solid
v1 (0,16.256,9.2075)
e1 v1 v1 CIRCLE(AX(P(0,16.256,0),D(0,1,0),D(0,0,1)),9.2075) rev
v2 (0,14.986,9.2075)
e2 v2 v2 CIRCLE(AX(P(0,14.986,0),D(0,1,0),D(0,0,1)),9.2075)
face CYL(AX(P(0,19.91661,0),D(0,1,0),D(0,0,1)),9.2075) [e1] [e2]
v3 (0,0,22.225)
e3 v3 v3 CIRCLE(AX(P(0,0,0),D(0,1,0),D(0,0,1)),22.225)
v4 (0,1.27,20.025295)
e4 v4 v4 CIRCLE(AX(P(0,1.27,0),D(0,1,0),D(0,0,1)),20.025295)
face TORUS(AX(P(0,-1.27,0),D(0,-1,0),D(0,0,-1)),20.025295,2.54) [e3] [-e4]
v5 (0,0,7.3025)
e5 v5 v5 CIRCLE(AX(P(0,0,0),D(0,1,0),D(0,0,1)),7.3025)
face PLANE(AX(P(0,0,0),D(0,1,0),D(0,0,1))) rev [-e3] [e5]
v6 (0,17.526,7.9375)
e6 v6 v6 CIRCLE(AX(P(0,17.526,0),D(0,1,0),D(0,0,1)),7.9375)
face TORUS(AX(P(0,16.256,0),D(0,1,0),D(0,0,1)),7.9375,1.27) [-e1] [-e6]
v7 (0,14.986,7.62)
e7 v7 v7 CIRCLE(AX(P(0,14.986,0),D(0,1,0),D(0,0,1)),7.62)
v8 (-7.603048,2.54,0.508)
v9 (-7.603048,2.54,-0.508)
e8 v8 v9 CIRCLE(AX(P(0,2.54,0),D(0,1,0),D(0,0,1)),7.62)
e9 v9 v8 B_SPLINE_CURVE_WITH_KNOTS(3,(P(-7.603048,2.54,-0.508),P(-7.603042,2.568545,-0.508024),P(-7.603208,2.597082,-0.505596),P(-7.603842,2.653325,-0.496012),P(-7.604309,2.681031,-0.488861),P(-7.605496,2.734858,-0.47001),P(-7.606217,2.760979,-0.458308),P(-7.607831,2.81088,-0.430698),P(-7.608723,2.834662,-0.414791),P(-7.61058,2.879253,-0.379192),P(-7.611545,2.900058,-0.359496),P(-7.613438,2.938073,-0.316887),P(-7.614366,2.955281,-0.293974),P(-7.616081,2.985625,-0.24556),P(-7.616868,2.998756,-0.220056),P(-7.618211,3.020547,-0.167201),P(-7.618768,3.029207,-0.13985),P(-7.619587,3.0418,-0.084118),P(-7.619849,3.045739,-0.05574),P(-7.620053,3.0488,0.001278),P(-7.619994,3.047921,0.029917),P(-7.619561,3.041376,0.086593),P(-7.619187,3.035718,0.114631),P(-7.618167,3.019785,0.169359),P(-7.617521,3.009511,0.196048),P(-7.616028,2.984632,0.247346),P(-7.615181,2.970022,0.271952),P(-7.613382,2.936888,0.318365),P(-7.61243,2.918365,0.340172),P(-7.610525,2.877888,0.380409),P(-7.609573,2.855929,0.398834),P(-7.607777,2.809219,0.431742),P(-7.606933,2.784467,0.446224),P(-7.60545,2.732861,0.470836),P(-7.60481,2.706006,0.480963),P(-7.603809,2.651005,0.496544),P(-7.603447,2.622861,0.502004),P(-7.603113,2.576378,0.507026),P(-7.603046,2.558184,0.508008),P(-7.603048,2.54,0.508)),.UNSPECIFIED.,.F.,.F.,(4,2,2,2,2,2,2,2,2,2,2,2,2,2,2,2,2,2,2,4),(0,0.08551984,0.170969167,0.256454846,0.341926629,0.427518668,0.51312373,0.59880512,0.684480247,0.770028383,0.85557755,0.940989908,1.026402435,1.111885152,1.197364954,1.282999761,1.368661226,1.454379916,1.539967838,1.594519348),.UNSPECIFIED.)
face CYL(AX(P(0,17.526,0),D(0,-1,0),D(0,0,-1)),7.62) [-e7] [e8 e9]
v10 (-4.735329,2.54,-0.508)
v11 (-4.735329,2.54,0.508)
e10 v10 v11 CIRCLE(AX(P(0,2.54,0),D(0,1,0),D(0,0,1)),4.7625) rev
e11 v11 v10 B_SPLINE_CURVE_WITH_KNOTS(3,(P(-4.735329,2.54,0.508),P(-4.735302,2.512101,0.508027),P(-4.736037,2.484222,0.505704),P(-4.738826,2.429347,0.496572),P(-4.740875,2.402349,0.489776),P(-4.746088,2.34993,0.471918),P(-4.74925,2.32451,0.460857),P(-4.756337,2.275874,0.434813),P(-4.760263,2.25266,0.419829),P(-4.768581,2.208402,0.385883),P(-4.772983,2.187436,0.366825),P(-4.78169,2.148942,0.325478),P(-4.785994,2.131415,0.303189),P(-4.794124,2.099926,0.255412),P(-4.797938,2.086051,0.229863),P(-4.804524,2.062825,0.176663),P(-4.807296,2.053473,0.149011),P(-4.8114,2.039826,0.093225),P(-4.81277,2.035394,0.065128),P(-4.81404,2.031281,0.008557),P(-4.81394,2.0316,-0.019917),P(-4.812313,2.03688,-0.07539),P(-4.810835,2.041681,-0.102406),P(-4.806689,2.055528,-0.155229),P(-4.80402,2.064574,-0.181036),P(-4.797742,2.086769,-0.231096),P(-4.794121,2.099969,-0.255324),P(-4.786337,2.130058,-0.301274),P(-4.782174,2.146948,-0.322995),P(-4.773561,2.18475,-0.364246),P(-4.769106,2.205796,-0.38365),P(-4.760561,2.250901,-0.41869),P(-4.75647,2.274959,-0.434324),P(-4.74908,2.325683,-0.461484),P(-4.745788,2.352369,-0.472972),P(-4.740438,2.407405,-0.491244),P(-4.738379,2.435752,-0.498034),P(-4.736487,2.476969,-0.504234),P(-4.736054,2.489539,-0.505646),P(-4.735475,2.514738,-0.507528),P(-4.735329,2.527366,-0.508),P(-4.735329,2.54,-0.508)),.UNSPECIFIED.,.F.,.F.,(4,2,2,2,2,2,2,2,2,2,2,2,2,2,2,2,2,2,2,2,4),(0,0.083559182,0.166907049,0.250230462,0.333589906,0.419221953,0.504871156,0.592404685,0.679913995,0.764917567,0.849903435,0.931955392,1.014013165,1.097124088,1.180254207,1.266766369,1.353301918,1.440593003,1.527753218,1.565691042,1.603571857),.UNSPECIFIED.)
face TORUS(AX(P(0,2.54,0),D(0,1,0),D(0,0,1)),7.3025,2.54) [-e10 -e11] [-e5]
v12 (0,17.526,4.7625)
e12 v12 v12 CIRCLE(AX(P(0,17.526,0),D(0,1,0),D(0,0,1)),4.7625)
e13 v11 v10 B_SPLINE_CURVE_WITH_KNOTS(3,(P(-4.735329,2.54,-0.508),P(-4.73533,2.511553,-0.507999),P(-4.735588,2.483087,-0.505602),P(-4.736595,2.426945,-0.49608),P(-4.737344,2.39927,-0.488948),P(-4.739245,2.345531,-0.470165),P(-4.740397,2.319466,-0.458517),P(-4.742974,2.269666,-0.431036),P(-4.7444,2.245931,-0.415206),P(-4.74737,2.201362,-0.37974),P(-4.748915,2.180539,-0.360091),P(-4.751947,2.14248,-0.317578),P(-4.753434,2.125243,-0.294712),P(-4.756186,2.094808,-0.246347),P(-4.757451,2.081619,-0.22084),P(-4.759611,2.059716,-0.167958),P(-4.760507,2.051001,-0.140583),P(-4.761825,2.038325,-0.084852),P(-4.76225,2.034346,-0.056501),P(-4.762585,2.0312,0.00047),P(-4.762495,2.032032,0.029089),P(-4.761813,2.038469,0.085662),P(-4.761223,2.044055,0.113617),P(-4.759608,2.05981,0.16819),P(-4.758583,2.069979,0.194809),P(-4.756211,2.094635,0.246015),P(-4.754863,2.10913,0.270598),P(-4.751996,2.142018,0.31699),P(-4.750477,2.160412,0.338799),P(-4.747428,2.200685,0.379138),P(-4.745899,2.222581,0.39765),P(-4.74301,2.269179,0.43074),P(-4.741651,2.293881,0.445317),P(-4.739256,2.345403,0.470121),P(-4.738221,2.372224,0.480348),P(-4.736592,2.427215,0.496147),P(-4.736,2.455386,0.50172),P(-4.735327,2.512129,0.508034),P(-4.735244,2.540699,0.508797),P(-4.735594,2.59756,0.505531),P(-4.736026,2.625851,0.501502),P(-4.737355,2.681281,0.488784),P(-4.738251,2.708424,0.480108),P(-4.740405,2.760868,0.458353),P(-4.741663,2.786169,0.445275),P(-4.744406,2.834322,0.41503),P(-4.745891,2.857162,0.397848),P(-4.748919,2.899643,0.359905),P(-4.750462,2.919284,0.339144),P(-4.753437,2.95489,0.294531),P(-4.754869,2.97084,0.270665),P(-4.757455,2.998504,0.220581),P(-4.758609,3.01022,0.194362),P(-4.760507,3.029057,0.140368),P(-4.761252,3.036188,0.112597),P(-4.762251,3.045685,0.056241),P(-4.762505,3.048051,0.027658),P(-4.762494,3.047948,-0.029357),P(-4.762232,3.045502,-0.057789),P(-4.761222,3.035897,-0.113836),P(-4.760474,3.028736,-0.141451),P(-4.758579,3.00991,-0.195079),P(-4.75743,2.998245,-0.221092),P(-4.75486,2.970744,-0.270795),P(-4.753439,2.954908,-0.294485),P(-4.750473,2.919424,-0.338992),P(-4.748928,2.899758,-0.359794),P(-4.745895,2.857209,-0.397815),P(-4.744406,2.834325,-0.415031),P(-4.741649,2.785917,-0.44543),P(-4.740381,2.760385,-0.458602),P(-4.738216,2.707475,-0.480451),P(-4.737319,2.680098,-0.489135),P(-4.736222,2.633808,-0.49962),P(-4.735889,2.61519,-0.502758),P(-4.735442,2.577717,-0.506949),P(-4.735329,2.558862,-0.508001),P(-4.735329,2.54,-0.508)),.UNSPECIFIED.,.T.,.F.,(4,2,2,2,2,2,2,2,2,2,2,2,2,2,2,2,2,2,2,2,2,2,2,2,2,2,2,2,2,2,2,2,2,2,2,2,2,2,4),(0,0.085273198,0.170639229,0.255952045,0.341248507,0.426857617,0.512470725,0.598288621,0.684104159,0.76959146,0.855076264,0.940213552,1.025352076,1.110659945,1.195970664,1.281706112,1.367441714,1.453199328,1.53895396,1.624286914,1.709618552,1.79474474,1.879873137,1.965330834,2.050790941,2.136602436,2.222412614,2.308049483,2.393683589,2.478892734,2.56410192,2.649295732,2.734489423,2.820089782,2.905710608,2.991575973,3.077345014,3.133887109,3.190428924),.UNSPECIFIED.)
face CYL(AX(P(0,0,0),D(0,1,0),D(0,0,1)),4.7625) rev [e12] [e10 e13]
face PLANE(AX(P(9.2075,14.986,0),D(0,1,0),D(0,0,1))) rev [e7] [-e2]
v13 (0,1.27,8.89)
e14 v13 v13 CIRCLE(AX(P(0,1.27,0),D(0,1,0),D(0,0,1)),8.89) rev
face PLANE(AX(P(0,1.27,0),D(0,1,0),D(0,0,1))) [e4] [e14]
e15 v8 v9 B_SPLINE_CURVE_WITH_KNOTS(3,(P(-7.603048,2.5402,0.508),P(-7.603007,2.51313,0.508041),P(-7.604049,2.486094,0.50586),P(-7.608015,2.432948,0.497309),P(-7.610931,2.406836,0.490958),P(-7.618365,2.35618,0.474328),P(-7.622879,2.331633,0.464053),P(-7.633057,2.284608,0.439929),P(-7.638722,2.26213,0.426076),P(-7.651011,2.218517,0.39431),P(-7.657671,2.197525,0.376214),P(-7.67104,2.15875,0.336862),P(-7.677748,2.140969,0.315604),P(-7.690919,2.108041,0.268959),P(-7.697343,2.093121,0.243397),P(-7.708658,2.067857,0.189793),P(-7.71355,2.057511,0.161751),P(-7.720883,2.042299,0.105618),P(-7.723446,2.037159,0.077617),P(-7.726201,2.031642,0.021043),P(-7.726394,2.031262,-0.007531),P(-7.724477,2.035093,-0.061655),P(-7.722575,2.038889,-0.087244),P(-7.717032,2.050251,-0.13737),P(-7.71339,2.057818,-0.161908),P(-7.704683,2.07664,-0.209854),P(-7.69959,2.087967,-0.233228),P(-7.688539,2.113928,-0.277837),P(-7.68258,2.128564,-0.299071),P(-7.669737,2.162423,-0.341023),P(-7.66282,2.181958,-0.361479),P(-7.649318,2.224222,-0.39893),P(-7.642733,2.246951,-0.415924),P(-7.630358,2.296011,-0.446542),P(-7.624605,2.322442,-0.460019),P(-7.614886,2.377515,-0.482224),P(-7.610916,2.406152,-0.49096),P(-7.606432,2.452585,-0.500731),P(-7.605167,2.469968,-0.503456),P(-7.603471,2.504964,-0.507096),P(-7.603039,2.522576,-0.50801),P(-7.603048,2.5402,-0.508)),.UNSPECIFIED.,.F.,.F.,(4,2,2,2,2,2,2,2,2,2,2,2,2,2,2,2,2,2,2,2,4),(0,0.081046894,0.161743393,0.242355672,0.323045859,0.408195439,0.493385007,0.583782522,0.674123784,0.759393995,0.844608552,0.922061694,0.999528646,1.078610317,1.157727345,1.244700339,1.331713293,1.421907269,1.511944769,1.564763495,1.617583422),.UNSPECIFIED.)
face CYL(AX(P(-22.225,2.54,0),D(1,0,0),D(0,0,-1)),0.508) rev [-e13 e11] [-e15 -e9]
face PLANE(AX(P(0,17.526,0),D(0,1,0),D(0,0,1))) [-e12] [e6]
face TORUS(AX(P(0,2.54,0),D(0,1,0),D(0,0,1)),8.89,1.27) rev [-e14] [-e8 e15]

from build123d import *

# Parameters (mm, degrees)
SKETCH1_R           = 22.225
BOSS_EXTRUDE1_DEPTH = 1.27
SKETCH2_R           = 7.62
BOSS_EXTRUDE2_DEPTH = 16.256
SKETCH3_R           = 4.7625
CUT_EXTRUDE1_DEPTH  = 36.986968836
FILLET1_R           = 1.27
SKETCH4_R           = 0.508
CUT_EXTRUDE2_DEPTH  = 36.986968836
FILLET2_R           = 2.54
FILLET3_R           = 2.54
SKETCH5_W           = 1.5875
SKETCH5_H           = 2.54
FILLET4_R           = 1.27


with BuildPart() as part:
    # Sketch1 → Boss-Extrude1 (new body)
    with BuildSketch(Plane(origin=(0, 0, 0), x_dir=(1, 0, 0), z_dir=(0, 1, 0))):
        with Locations(Location((0, 0, 0), (0, 0, 270))):
            Circle(SKETCH1_R)
    extrude(amount=BOSS_EXTRUDE1_DEPTH)

    # Sketch2 → Boss-Extrude2 (add)
    with BuildSketch(Plane(origin=(0, 1.27, 0), x_dir=(1, 0, 0), z_dir=(0, 1, 0))):
        with Locations(Location((0, 0, 0), (0, 0, 270))):
            Circle(SKETCH2_R)
    extrude(amount=BOSS_EXTRUDE2_DEPTH)

    # Sketch3 → Cut-Extrude1 (cut, through all)
    with BuildSketch(Plane(origin=(0, 17.526, 0), x_dir=(1, 0, 0), z_dir=(0, 1, 0))):
        with Locations(Location((0, 0, 0), (0, 0, 270))):
            Circle(SKETCH3_R)
    extrude(amount=-CUT_EXTRUDE1_DEPTH, mode=Mode.SUBTRACT)

    # Fillet1
    fillet1_edges = [part.edges().sort_by_distance(p)[0] for p in [
        (0, 1.27, -7.62),
    ]]
    fillet(fillet1_edges, radius=FILLET1_R)

    # Sketch4 → Cut-Extrude2 (cut, through all)
    with BuildSketch(Plane(origin=(0, 0, 0), x_dir=(0, 0, -1), z_dir=(1, 0, 0))):
        with Locations((0, 2.54)):
            Circle(SKETCH4_R)
    extrude(amount=-CUT_EXTRUDE2_DEPTH, mode=Mode.SUBTRACT)

    # Fillet2
    # the kernel refuses this fillet: 2.54 mm, written as the material it takes off along each edge
    with BuildSketch(Plane(origin=(0, 1.27, 0), x_dir=(0, 0, 1), z_dir=(-1, 0, 0))) as fillet2_piece_1:
        with BuildLine():
            CenterArc((20.025295474, -2.54), FILLET2_R, 30, 60)
            Line((22.225, -1.27), (22.268994091, -1.2446))
            ThreePointArc((22.268994091, -1.2446), (22.2758, -0.635), (22.2758, 0))
            Line((22.2758, 0), (22.225, 0.0508))
            Line((22.225, 0.0508), (20.025295474, 0.0508))
            Line((20.025295474, 0.0508), (20.025295474, 0))
        make_face()
    revolve(axis=Axis((0, 1.27, 0), (0, 1, 0)), mode=Mode.SUBTRACT)

    # Fillet3
    # the kernel refuses this fillet: 2.54 mm, written as the material it takes off along each edge
    with BuildSketch(Plane(origin=(0, 0, 0), x_dir=(0, 0, 1), z_dir=(-1, 0, 0))) as fillet3_piece_1:
        with BuildLine():
            CenterArc((4.7625 + FILLET3_R, FILLET3_R), FILLET3_R, 180, 90)
            Line((4.7625, FILLET3_R), (4.7625, 0))
            Line((4.7625, 0), (4.7625 + FILLET3_R, 0))
        make_face()
    revolve(axis=Axis((0, 0, 0), (0, 1, 0)), mode=Mode.SUBTRACT)

    # Sketch5 → Revolve1 (revolve)
    with BuildSketch(Plane.XY, mode=Mode.PRIVATE) as revolve1_sk:
        with Locations((8.41375, 16.256)):
            Rectangle(SKETCH5_W, SKETCH5_H)
    revolve(revolve1_sk.sketch.rotate(Axis((0, 19.916609625, 0), (0, -1, 0)), 183.822553729), axis=Axis((0, 19.916609625, 0), (0, -1, 0)))

    # Fillet4
    fillet4_edges = [part.edges().sort_by_distance(p)[0] for p in [
        (9.187016104, 17.526, 0.613833333),
    ]]
    fillet(fillet4_edges, radius=FILLET4_R)


solid = part.part
